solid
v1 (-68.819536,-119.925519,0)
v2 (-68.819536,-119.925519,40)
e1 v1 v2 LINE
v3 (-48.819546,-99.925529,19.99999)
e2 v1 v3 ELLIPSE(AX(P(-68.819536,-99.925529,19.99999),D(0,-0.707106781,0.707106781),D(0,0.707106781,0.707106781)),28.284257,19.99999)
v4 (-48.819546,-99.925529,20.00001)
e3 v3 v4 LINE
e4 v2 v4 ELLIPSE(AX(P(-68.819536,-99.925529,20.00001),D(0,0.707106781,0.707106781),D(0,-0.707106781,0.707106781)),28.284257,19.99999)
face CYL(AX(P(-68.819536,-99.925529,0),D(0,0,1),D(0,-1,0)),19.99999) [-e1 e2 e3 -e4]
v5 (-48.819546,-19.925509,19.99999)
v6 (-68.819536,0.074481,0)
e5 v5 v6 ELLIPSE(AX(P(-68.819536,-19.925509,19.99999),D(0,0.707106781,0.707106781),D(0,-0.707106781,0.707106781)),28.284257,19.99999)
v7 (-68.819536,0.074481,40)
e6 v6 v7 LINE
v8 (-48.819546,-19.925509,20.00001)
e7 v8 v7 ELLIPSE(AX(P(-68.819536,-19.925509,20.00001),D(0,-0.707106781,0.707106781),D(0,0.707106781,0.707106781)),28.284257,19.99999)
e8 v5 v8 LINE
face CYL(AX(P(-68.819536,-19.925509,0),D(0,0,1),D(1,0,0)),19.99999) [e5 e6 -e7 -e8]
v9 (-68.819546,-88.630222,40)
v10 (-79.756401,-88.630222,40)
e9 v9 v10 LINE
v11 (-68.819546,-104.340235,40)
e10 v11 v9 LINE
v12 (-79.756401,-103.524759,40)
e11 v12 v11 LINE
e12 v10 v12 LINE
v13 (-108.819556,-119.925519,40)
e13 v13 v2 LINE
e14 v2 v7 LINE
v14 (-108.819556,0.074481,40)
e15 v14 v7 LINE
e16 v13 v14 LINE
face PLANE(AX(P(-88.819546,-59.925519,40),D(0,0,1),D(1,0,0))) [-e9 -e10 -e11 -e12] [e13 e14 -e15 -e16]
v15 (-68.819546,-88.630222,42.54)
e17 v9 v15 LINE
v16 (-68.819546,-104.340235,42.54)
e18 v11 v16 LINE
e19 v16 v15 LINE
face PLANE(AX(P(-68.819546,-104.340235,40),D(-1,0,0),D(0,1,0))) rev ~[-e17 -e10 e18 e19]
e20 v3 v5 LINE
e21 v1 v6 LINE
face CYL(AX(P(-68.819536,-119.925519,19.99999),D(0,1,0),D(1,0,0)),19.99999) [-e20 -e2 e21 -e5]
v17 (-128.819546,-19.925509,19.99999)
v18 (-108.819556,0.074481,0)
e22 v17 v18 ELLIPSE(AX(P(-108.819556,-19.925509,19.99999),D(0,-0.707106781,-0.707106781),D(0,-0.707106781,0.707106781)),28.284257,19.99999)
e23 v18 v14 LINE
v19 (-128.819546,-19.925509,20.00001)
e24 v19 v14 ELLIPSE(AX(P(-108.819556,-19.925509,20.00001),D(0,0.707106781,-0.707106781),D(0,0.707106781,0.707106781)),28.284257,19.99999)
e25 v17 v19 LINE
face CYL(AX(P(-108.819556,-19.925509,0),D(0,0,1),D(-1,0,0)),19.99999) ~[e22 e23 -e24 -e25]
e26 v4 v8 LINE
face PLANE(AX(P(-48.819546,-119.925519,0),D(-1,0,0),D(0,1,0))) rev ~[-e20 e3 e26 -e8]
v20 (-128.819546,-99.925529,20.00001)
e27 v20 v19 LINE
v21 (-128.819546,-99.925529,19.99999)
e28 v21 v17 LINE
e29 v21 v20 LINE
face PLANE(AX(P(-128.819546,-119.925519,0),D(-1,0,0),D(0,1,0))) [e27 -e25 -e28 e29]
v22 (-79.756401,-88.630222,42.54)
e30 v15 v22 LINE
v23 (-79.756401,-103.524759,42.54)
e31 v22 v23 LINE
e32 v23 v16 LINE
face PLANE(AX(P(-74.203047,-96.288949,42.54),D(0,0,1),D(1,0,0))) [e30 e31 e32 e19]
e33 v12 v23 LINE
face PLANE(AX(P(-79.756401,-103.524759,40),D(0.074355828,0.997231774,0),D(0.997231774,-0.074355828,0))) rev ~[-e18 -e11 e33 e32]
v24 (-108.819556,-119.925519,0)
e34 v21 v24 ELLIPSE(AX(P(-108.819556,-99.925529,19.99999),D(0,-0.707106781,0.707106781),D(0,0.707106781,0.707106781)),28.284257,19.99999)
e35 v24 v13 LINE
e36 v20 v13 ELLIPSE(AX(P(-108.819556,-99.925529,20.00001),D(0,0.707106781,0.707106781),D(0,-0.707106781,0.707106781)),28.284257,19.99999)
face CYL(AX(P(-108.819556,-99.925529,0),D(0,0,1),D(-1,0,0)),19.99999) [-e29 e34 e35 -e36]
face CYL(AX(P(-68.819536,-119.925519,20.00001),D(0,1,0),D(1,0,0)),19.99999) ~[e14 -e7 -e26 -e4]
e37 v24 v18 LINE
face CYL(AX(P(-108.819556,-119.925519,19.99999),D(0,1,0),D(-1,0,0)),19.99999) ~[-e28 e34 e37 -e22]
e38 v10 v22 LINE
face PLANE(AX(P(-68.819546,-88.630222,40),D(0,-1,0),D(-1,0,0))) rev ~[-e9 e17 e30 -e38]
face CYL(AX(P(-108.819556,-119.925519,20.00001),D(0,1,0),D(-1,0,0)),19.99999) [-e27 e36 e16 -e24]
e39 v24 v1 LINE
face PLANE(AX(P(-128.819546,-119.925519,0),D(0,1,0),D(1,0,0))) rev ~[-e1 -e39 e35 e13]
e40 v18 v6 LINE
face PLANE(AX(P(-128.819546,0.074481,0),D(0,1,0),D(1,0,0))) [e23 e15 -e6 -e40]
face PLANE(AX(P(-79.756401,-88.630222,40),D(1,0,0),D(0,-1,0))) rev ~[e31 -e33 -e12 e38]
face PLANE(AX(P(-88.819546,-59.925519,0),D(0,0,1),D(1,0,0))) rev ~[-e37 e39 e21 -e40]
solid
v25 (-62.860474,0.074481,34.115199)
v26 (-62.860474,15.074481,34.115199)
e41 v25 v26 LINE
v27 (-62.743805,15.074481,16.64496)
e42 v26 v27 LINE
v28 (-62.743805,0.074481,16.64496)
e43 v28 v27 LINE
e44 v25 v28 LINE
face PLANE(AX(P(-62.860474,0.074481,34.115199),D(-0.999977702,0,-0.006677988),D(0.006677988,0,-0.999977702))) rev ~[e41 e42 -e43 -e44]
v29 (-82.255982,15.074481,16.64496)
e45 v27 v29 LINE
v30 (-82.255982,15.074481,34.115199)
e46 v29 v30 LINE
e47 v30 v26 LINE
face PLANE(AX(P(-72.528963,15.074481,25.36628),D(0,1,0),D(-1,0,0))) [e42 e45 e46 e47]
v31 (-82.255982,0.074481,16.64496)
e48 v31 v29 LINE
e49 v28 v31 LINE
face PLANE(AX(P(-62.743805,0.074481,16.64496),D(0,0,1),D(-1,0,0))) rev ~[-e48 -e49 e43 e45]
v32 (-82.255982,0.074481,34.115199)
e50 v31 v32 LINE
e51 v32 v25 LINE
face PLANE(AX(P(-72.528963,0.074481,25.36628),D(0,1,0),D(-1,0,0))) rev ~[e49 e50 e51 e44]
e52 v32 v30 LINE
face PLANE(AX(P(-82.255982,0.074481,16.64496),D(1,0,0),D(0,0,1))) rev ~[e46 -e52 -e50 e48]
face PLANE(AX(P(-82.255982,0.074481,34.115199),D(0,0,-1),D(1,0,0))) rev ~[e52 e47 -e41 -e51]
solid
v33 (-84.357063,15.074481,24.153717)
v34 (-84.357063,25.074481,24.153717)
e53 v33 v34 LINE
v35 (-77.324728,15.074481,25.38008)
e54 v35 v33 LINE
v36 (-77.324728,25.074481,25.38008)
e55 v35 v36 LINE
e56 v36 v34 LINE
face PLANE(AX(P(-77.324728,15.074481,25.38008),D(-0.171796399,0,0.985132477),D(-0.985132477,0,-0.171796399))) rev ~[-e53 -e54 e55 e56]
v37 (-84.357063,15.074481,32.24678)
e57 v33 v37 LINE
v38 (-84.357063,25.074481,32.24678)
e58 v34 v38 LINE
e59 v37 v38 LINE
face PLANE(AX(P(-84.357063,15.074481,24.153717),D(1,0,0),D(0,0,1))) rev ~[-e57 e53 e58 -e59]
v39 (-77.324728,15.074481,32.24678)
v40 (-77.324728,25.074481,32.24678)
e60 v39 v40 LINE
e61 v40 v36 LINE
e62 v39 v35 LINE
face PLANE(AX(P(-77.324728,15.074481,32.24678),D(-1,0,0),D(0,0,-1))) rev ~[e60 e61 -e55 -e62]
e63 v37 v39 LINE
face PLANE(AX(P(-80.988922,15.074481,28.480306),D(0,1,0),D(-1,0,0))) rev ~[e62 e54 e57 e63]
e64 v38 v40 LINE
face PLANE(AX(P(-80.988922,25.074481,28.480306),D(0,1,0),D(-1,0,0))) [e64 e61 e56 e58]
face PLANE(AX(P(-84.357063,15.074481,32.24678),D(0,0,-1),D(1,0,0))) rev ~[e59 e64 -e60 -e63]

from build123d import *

# Parameters (mm, degrees)
F0_W     = 80
F0_H     = 120
F1_DEPTH = 40
F2_R     = 19.99999
F4_DEPTH = 2.54
F6_DEPTH = 15
F8_DEPTH = 10


# Not quite as in the source:
# - a fillet or chamfer is up to 0.001 mm smaller than in the source, because OpenCascade refuses the exact size


with BuildPart() as f1:
    # F0 (on Top) → F1 (new body)
    with BuildSketch(Plane.XY):
        with Locations((-88.8195456503, -59.9255193707)):
            Rectangle(F0_W, F0_H)
    extrude(amount=F1_DEPTH)

    # F2 (radius 20 in the source; OpenCascade refuses exactly that, so slightly less here)
    f2_edges = [f1.edges().sort_by_distance(p)[0] for p in [
        (-48.819546, -119.925519, 20),
        (-48.819546, 0.074481, 20),
        (-48.819546, -59.925519, 0),
        (-48.819546, -59.925519, 40),
        (-128.819546, 0.074481, 20),
        (-128.819546, -119.925519, 20),
        (-128.819546, -59.925519, 0),
        (-128.819546, -59.925519, 40),
    ]]
    fillet(f2_edges, radius=F2_R)

    # F3 (on face) → F4 (join)
    with BuildSketch(Plane.XY.offset(40)):
        Polygon((-79.7564014792, -103.5247588724), (-68.8195456503, -104.3402352648), (-68.8195456503, -88.6302217841), (-79.7564014792, -88.6302217841), align=None)
    extrude(amount=F4_DEPTH)


with BuildPart() as f6:
    # F5 (on face) → F6 (new body)
    with BuildSketch(Plane(origin=(0, 0.0744806293, 0), x_dir=(-1, 0, 0), z_dir=(0, 1, 0))):
        Polygon((82.2559818625, 34.1151989996), (62.8604739904, 34.1151989996), (62.7438053489, 16.6449602693), (82.2559818625, 16.6449602693), align=None)
    extrude(amount=F6_DEPTH)


with BuildPart() as f8:
    # F7 (on face) → F8 (new body)
    with BuildSketch(Plane(origin=(0, 15.0744806293, 0), x_dir=(-1, 0, 0), z_dir=(0, 1, 0))):
        Polygon((77.3247284815, 32.2467796504), (77.3247284815, 25.3800796345), (84.357063286, 24.1537168622), (84.357063286, 32.2467796504), align=None)
    extrude(amount=F8_DEPTH)


solid = Compound([f1.part, f6.part, f8.part])
